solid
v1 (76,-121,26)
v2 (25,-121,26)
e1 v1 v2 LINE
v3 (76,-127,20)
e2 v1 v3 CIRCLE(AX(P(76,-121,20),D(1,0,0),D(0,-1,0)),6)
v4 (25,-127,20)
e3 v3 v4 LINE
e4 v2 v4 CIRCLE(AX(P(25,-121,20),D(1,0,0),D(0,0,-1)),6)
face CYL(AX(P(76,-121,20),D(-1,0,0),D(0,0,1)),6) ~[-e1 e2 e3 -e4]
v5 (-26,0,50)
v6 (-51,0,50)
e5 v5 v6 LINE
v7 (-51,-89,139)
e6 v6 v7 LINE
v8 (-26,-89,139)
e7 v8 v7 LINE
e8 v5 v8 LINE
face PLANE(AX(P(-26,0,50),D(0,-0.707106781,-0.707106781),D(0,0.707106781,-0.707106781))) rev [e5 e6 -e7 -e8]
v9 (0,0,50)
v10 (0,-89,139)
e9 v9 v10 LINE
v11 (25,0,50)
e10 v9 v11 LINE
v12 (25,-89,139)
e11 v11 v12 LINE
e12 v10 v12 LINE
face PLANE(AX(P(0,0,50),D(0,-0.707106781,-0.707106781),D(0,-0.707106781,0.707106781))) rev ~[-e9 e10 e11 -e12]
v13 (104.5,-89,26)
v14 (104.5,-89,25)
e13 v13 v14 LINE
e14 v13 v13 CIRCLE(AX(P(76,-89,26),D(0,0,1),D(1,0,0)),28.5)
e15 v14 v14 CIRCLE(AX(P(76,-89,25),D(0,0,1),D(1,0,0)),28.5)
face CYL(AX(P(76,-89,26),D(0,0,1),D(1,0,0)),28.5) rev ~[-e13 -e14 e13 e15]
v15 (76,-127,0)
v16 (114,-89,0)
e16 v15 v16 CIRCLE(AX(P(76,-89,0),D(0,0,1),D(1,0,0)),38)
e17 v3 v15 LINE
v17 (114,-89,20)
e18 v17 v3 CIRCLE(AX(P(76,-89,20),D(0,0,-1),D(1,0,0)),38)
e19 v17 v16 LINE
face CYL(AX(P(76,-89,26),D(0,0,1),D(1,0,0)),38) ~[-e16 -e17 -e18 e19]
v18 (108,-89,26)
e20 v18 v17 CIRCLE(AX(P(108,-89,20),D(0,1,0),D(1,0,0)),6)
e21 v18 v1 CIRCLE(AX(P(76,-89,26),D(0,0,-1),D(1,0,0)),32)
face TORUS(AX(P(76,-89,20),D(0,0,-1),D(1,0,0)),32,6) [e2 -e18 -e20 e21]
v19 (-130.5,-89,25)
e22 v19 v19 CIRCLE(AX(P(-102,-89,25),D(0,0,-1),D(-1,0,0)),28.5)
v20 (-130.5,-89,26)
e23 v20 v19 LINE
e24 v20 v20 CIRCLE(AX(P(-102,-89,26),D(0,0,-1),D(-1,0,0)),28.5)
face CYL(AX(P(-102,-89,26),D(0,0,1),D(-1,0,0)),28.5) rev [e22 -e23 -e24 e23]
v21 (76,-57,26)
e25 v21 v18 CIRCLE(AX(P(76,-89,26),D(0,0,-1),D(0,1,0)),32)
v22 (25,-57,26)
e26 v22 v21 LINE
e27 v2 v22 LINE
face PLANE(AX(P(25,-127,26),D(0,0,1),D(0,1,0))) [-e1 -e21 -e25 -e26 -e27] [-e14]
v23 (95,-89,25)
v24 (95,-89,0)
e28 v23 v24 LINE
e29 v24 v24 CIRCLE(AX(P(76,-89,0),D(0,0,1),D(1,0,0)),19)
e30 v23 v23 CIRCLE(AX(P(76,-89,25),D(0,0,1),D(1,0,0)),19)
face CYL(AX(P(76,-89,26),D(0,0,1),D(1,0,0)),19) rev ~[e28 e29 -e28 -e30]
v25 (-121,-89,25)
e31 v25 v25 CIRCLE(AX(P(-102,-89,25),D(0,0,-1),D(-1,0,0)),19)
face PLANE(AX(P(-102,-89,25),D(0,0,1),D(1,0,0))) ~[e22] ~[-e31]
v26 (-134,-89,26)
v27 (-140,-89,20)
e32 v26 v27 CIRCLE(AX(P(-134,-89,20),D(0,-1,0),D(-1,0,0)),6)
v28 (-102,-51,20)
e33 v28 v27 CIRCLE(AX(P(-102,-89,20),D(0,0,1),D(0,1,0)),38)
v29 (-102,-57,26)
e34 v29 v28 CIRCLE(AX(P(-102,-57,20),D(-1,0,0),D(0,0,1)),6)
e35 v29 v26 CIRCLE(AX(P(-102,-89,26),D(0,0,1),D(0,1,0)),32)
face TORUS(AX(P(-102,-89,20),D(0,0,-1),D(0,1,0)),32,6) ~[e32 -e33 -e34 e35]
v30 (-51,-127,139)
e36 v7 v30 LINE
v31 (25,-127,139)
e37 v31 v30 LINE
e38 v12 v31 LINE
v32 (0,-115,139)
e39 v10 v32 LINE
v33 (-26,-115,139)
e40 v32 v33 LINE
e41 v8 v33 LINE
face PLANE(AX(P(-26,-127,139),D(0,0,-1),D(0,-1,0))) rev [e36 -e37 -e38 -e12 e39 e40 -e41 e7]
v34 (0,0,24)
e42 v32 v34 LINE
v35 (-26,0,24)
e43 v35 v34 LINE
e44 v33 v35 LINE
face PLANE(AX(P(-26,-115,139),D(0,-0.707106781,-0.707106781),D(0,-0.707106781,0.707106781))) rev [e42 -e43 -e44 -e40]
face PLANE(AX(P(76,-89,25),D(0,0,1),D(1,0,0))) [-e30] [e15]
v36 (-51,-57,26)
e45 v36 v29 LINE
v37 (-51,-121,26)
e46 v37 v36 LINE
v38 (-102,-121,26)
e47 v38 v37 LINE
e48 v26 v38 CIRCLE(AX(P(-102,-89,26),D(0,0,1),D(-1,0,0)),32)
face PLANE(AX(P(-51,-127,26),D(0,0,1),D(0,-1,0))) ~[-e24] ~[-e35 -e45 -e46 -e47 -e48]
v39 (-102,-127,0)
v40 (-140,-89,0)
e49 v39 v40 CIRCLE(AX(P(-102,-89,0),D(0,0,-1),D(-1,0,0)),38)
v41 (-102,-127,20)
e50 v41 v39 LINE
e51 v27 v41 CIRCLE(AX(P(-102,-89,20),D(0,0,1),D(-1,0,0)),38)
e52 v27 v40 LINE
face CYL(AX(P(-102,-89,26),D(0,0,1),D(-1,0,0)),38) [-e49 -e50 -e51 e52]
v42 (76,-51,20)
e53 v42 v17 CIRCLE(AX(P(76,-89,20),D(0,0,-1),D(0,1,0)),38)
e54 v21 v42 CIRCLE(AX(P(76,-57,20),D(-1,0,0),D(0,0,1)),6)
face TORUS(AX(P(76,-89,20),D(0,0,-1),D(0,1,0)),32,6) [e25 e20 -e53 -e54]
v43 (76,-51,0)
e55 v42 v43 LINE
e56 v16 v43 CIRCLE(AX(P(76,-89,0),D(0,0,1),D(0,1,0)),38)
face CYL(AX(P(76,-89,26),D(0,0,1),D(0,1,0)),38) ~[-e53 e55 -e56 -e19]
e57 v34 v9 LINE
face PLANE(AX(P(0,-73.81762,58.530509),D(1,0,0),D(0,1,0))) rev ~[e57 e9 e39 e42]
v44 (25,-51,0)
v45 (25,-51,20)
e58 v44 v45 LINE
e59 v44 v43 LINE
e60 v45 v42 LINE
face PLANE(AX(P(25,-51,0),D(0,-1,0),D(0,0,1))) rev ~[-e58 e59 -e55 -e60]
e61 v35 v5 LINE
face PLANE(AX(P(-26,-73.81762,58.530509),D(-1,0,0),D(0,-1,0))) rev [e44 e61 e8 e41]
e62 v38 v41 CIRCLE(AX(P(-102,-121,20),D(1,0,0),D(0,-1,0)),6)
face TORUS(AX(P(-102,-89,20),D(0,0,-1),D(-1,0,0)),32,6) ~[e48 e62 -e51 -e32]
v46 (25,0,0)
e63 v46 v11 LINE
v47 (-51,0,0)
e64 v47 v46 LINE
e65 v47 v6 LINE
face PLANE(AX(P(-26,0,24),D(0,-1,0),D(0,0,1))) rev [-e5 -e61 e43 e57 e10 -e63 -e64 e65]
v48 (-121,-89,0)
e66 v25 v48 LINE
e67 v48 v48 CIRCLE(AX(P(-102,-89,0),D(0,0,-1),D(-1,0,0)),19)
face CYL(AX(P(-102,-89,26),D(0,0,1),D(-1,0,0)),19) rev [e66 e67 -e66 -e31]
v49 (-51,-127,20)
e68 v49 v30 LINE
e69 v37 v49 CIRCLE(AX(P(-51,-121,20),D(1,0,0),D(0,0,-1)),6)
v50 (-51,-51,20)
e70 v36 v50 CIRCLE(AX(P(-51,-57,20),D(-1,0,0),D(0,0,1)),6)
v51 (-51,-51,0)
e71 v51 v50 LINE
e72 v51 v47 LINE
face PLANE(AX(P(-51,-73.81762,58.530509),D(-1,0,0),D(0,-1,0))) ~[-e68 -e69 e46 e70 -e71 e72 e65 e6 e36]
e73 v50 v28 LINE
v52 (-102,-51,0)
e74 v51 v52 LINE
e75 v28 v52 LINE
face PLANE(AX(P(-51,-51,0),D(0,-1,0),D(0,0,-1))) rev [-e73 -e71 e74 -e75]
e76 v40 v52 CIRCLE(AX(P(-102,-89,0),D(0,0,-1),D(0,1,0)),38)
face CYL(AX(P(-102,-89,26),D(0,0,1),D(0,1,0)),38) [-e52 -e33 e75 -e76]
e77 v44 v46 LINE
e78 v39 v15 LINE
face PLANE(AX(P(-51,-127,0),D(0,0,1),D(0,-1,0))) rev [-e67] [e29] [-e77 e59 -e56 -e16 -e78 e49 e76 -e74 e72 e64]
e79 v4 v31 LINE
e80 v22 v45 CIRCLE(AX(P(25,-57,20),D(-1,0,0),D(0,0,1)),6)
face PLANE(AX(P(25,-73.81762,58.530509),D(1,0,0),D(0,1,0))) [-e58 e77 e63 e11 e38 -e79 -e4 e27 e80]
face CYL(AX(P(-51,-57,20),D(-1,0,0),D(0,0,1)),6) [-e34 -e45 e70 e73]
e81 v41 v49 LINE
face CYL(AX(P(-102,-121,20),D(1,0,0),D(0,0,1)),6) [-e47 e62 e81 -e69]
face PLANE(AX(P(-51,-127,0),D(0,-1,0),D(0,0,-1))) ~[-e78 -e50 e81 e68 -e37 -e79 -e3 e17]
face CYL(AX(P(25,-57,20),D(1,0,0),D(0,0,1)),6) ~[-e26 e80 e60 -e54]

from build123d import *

# Parameters (mm, degrees)
F1_DEPTH  = 25
F3_DEPTH  = 13
F4_W      = 76
F4_H      = 26
F5_DEPTH  = 89
F7_DEPTH  = 26.001
F9_R      = 19
F10_DEPTH = 26.001
F9_R_2    = 28.5
F11_DEPTH = 1
F12_R     = 6


with BuildPart() as f1:
    # F0 (on Right) → F1 (new body)
    with BuildSketch(Plane.YZ):
        Polygon((-127, 0), (0, 0), (0, 50), (-89, 139), (-127, 139), align=None)
    extrude(amount=F1_DEPTH)

    # F2 (on face) → F3 (join)
    with BuildSketch(Plane(origin=(0, 0, 0), x_dir=(0, -1, 0), z_dir=(-1, 0, 0))):
        Polygon((0, 24), (0, 0), (127, 0), (127, 139), (115, 139), align=None)
    extrude(amount=F3_DEPTH)

    # F4 (on face) → F5 (join)
    with BuildSketch(Plane.YZ.offset(25)):
        with Locations((-89, 13)):
            Rectangle(F4_W, F4_H)
    extrude(amount=F5_DEPTH)

    # F6 (on face) → F7 (cut, through all)
    with BuildSketch(Plane.XY.offset(26)):
        with BuildLine():
            ThreePointArc((76, -51), (102.8700576851, -62.1299423149), (114, -89))
            Line((114, -89), (114, -51))
            Line((114, -51), (76, -51))
        make_face()
        with BuildLine():
            Line((114, -127), (114, -89))
            ThreePointArc((114, -89), (102.8700576851, -115.8700576851), (76, -127))
            Line((76, -127), (114, -127))
        make_face()
    extrude(amount=-F7_DEPTH, mode=Mode.SUBTRACT)

    # F9 (on face) → F10 (cut, through all)
    with BuildSketch(Plane.XY.offset(26)):
        with Locations((76, -89)):
            Circle(F9_R)
    extrude(amount=-F10_DEPTH, mode=Mode.SUBTRACT)

    # F9 (on face) → F11 (cut)
    with BuildSketch(Plane.XY.offset(26)):
        with Locations((76, -89)):
            Circle(F9_R_2)
        with Locations((76, -89)):
            Circle(F9_R, mode=Mode.SUBTRACT)
    extrude(amount=-F11_DEPTH, mode=Mode.SUBTRACT)

    # F12
    f12_edges = [f1.edges().sort_by_distance(p)[0] for p in [
        (50.5, -51, 26),
        (50.5, -127, 26),
        (114, -89, 26),
    ]]
    fillet(f12_edges, radius=F12_R)

    # F13: F1 across plane


with BuildPart() as f1_1:
    add(f1.part)
    add(f1.part.mirror(Plane.YZ.offset(-13)))


solid = f1_1.part
